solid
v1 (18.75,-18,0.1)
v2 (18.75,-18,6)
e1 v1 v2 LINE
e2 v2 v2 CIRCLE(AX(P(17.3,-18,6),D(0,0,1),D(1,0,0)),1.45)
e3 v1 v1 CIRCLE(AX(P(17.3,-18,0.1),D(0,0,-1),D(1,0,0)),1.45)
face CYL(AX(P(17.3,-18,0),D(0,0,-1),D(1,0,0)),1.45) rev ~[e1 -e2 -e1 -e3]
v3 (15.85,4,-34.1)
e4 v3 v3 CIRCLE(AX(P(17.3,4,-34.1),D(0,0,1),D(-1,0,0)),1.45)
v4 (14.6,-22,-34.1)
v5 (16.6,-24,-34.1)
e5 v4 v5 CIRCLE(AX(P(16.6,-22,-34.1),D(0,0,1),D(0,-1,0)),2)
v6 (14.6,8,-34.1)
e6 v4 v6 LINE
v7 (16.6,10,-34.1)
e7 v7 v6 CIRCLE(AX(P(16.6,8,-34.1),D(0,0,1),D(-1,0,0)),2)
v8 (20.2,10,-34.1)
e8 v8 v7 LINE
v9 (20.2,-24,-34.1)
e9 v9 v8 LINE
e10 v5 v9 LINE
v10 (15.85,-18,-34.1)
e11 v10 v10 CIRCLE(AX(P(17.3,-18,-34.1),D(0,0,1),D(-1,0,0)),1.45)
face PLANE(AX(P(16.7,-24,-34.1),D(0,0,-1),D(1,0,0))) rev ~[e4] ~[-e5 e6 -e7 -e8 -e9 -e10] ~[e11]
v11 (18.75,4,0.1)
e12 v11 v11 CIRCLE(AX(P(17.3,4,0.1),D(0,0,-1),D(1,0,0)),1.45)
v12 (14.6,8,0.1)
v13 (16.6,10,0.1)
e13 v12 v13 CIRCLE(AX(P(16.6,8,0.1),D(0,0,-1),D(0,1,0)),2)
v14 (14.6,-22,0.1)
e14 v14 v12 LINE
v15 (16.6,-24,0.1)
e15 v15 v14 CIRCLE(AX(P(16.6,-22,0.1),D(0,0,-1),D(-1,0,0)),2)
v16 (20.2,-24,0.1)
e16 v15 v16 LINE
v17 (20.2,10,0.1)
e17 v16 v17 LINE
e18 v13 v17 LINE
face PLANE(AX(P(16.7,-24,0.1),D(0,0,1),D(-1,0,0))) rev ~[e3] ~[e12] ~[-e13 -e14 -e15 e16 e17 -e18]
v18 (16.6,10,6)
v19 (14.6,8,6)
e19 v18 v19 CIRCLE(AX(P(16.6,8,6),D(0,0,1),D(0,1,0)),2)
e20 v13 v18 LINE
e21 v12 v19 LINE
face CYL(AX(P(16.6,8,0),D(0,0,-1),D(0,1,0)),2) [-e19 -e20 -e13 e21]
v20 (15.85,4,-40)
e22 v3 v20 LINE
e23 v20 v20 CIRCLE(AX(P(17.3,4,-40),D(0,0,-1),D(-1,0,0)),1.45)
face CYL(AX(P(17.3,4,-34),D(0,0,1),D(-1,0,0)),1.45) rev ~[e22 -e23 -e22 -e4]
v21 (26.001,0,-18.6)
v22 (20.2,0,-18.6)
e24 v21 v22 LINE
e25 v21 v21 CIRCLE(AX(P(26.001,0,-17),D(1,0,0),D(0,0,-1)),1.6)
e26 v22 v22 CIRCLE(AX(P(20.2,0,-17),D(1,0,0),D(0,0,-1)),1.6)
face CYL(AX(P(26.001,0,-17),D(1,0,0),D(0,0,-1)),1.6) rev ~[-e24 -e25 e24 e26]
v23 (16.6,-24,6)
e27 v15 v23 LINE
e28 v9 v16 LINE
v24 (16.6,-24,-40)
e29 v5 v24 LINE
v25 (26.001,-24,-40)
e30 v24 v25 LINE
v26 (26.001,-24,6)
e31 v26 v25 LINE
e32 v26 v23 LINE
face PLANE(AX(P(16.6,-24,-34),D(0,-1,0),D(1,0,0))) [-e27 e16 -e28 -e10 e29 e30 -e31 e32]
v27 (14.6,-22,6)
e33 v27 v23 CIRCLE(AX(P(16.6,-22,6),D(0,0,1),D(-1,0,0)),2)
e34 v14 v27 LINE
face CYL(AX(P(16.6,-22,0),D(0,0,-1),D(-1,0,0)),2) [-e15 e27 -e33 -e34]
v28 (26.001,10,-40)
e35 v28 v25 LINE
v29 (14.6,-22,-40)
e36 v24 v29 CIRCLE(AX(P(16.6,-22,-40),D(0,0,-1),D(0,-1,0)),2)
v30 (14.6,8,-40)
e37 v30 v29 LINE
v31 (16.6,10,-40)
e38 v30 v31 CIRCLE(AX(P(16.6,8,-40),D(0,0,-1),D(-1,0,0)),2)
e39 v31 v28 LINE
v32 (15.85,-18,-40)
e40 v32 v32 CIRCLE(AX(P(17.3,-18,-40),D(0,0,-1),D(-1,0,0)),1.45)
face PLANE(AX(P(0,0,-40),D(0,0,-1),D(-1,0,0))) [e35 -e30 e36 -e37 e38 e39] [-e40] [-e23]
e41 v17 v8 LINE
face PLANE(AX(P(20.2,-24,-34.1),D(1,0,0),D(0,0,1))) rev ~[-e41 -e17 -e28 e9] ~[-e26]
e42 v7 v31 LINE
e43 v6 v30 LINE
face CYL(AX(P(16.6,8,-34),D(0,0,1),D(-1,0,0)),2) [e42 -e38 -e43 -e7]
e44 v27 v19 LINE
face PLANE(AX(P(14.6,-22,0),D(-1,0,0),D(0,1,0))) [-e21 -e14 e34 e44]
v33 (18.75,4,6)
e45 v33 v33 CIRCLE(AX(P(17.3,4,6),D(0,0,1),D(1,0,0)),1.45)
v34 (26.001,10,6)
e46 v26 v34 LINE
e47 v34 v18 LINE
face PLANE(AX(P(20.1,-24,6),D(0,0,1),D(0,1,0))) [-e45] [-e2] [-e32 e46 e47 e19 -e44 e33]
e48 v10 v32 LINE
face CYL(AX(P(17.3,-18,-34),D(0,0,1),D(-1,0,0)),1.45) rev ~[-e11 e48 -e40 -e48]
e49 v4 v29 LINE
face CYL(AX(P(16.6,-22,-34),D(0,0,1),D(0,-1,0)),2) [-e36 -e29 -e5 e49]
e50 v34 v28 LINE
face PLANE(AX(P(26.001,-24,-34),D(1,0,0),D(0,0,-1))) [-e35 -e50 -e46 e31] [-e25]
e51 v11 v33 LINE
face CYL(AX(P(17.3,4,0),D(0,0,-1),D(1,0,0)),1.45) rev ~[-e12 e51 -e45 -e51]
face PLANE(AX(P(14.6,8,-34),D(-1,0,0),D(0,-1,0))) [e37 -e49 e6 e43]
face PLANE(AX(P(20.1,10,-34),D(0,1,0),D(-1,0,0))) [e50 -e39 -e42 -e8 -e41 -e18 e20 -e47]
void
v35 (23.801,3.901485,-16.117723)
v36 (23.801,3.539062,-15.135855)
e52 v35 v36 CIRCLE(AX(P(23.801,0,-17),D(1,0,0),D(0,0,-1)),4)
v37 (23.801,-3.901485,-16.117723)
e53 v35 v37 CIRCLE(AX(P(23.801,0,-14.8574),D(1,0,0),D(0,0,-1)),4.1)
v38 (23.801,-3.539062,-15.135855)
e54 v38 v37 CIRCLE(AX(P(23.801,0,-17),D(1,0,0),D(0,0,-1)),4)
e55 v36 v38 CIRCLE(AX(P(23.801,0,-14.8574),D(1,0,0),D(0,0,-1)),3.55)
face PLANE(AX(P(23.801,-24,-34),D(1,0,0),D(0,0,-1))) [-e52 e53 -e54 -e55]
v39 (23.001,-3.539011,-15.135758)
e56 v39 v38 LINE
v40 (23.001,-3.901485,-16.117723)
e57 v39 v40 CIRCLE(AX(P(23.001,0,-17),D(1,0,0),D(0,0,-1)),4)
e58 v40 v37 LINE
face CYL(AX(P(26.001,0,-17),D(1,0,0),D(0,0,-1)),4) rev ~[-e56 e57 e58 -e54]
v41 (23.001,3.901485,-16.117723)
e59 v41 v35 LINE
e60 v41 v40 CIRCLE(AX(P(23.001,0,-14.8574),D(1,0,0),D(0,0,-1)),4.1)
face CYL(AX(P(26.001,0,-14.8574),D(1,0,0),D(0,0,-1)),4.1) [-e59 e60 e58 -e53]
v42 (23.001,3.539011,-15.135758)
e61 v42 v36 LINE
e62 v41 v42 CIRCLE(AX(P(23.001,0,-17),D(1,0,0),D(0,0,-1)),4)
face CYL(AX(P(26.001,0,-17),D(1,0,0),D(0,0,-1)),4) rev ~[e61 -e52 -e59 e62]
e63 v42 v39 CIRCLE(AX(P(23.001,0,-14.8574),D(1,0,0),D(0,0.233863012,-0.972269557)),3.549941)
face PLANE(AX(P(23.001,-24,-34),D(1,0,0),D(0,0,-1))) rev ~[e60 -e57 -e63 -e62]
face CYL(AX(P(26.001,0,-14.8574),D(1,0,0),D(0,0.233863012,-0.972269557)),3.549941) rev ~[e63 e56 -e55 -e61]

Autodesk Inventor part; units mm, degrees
ref_plane "YZ Plane" through (0, 0, 0) normal (1, 0, 0) x (0, 1, 0)
ref_plane "XZ Plane" through (0, 0, 0) normal (0, 1, 0) x (-1, 0, 0)
ref_plane "XY Plane" through (0, 0, 0) normal (0, 0, 1) x (1, 0, 0)
ref_plane "작업 평면1" through (0, 0, 0) normal (0, 0, 1) x (1, 0, 0)
sketch "스케치1" plane through (0, 0, 0) normal (0, 0, 1) x (1, 0, 0)
  circle A0 centre (0, 0) radius 1.5 projected
  circle A1 centre (0, 0) radius 4.9 projected
  circle A2 centre (0, 0) radius 7.05 projected
  circle A3 centre (7.7781, 7.7783) radius 1.55 projected
  circle A4 centre (-7.7783, 7.7781) radius 1.55 projected
  circle A5 centre (-7.7781, -7.7783) radius 1.55 projected
  circle A6 centre (7.7783, -7.7781) radius 1.55 projected
  circle A7 centre (0, 0) radius 5 projected
  circle A8 centre (0, 0) radius 13.9 projected
  circle A9 centre (0.0001, -11) radius 1.55 projected
  circle A10 centre (-11, -0.0001) radius 1.55 projected
  circle A11 centre (-0.0001, 11) radius 1.55 projected
  circle A12 centre (11, 0.0001) radius 1.55 projected
  line L0 (0, 0) -> (-50, 0)
  line L1 (-15, 14.5) -> (-11.5, 14.5) projected
  line L2 (-15, 14.5) -> (-20.1, 8.5) projected
  line L3 (-20.1, 8.5) -> (-20.1, -44.6) projected
  line L4 (-20.1, -44.6) -> (-15, -50.6) projected
  line L5 (-15, -50.6) -> (15, -50.6) projected
  line L6 (15, -50.6) -> (20.1, -44.6) projected
  line L7 (20.1, -44.6) -> (20.1, 8.5) projected
  line L8 (20.1, 8.5) -> (15, 14.5) projected
  line L9 (11.5, 14.5) -> (15, 14.5) projected
  arc A13 (14.5, 11.5) -> (11.5, 14.5) centre (11.5, 11.5) ccw projected
  line L10 (14.5, -42) -> (14.5, 11.5) projected
  arc A14 (11.5, -45) -> (14.5, -42) centre (11.5, -42) ccw projected
  line L11 (-11.5, -45) -> (11.5, -45) projected
  arc A15 (-14.5, -42) -> (-11.5, -45) centre (-11.5, -42) ccw projected
  line L12 (-14.5, 11.5) -> (-14.5, -42) projected
  arc A16 (-11.5, 14.5) -> (-14.5, 11.5) centre (-11.5, 11.5) ccw projected
  circle A17 centre (17.3, 4) radius 1.35 projected
  circle A18 centre (17.3, -18) radius 1.35 projected
  circle A19 centre (17.3, -40) radius 1.35 projected
  circle A20 centre (11, -47.8) radius 1.35 projected
  circle A21 centre (-17.3, 4) radius 1.35 projected
  circle A22 centre (-17.3, -18) radius 1.35 projected
  circle A23 centre (-17.3, -40) radius 1.35 projected
  circle A24 centre (-11, -47.8) radius 1.35 projected
  circle A25 centre (-17.3, -18) radius 1.45
  circle A26 centre (-17.3, 4) radius 1.45
  arc A27 (-14.6, -42) -> (-11.5, -45.1) centre (-11.5, -42) ccw
  line L13 (-11.5, -45.1) -> (11.5, -45.1)
  arc A28 (11.5, -45.1) -> (14.6, -42) centre (11.5, -42) ccw
  line L14 (14.6, -22) -> (14.6, 8)
  arc A29 (14.6, 11.5) -> (12.5954, 14.4) centre (11.5, 11.5) ccw
  line L15 (12.5954, 14.4) -> (14.9538, 14.4)
  line L16 (14.9538, 14.4) -> (18.6938, 10)
  line L17 (20, -24) -> (20, -44.5632)
  line L18 (20, -44.5632) -> (14.9538, -50.5)
  line L19 (14.9538, -50.5) -> (-14.9538, -50.5)
  line L20 (-14.9538, -50.5) -> (-20, -44.5632)
  line L21 (-18.6938, 10) -> (-14.9538, 14.4)
  line L22 (-14.9538, 14.4) -> (-12.5954, 14.4)
  arc A30 (-12.5954, 14.4) -> (-14.6, 11.5) centre (-11.5, 11.5) ccw
  line L23 (-14.6, 11.5) -> (-14.6, -42)
  line L24 (-17.3, 4) -> (-17.3, 10)
  line L25 (-14.6, 10) -> (-18.0941, 10)
  line L26 (-17.3, -19.35) -> (-17.3, -24)
  line L27 (-14.6, -24) -> (-18.0059, -24)
  line L28 (-20, -44.5632) -> (-20, -24)
  line L29 (-20.0059, -22.0059) -> (-20.0941, 7.9941)
  arc A31 (-18.0941, 10) -> (-20.0941, 7.9941) centre (-18.0941, 8) ccw
  arc A32 (-20.0059, -22.0059) -> (-18.0059, -24) centre (-18.0059, -22) ccw
  line L30 (-36.7788, 11.5) -> (-35.2788, 11.5) projected
  line L31 (-36.7788, 11.5) -> (-36.7788, -41.5) projected
  line L32 (-35.2788, -41.5) -> (-36.7788, -41.5) projected
  spline S0 degree 3 poles (-34.7788, -41) (-34.788, -41.241) (-35.0376, -41.5) (-35.2788, -41.5) knots 0 0 0 0 1 1 1 1 projected
  line L33 (-34.7788, 11) -> (-34.7788, -41) projected
  ellipse E0 centre (-35.2788, 11) end of major axis (-35.2788, 11.5) minor radius 0.5 (-34.7788, 11) -> (-35.2788, 11.5) ccw projected
  line L34 (16.6, -24) -> (18.1, -24)
  line L35 (16.6, 10) -> (18.1, 10)
  line L36 (20.1, -22) -> (20.1, 8)
  circle A33 centre (17.3, 4) radius 1.45
  circle A34 centre (17.3, -18) radius 1.45
  line L37 (18.1, -24) -> (20.1, -24)
  line L38 (20.1, -24) -> (20.1, -22)
  arc A35 (14.6, -22) -> (16.6, -24) centre (16.6, -22) ccw
  line L39 (20.1, 8) -> (20.1, 10)
  line L40 (18.1, 10) -> (20.1, 10)
  arc A36 (16.6, 10) -> (14.6, 8) centre (16.6, 8) ccw
  point P0 (0, 0)
  point P1 (-20.1, 10)
  point P2 (-20.1, -24)
  point P3 (14.6, -24)
  point P4 (14.6, 10)
  point P5 (-19.9941, 8.6246)
  point P6 (-19.0167, 9.7745)
  point P7 (18.825, 10)
  point P8 (20.1, 8.5)
  dimension "d0" = 50
  dimension "d1" = 0.1
  dimension "d2" = 0.1
  dimension "d3" = 0.1
  dimension "d4" = 6
  dimension "d5" = 6
  dimension "d6" = 2
  dimension "d10" = 0.1
  dimension "d11" = 0.1
  dimension "d12" = 2
  dimension "d13" = 2
extrude "돌출1" add sketch "스케치1" along normal blind 6 contours L37 L34 A35 L14 A36 L35 L40 L8 L7 | L40 L39 L8
ref_plane "작업 평면2" through (0, 0, -34) normal (0, 0, -1) x (-1, 0, 0)
sketch "스케치2" plane through (0, 0, -34) normal (0, 0, -1) x (-1, 0, 0)
  line L0 (-16.6, -24) -> (-20.1, -24) projected
  line L1 (-20.1, -24) -> (-20.1, 10) projected
  line L2 (-20.1, 10) -> (-16.6, 10) projected
  arc A0 (-14.6, 8) -> (-16.6, 10) centre (-16.6, 8) ccw projected
  line L3 (-14.6, 8) -> (-14.6, -22) projected
  arc A1 (-16.6, -24) -> (-14.6, -22) centre (-16.6, -22) ccw projected
  circle A2 centre (-17.3, 4) radius 1.45 projected
  circle A3 centre (-17.3, -18) radius 1.45 projected
  point P0 (0, 0)
extrude "돌출2" add sketch "스케치2" along normal blind 6
sketch "스케치3" plane through (20.1, -24, -34) normal (1, 0, 0) x (0, 0, -1)
  line L0 (0, 34) -> (0, 0) projected
  line L1 (0, 0) -> (6, 0) projected
  line L2 (6, 34) -> (6, 0) projected
  line L3 (0, 34) -> (6, 34) projected
  line L4 (-34, 0) -> (-34, 34) projected
  line L5 (-34, 34) -> (-40, 34) projected
  line L6 (-40, 0) -> (-40, 34) projected
  line L7 (-34, 0) -> (-40, 0) projected
  line L8 (6, 0) -> (-40, 0)
  line L9 (-40, 0) -> (-40, 34)
  line L10 (-40, 34) -> (6, 34)
  line L11 (6, 34) -> (6, 0)
  point P0 (-34, 24)
extrude "돌출3" add sketch "스케치3" along normal blind 5.901
sketch "스케치4" plane through (26.001, -24, -34) normal (1, 0, 0) x (0, 0, -1)
  line L0 (-5.3426, 23.9933) -> (-5.3329, 43.9933) projected
  line L1 (-5.3329, 43.9933) -> (-32.9329, 44.0067) projected
  line L2 (-32.9329, 44.0067) -> (-32.9426, 24.0067) projected
  arc A0 (-32.9426, 24.0067) -> (-5.3426, 23.9933) centre (-19.1426, 24) ccw projected
  circle A1 centre (-11.3683, 16.218) radius 1.65 projected
  circle A2 centre (-19.148, 13) radius 1.65 projected
  circle A3 centre (-26.9246, 16.2256) radius 1.65 projected
  circle A4 centre (-30.1426, 24.0054) radius 1.65 projected
  circle A5 centre (-26.917, 31.782) radius 1.65 projected
  circle A6 centre (-19.1373, 35) radius 1.65 projected
  circle A7 centre (-11.3607, 31.7744) radius 1.65 projected
  circle A8 centre (-8.1426, 23.9946) radius 1.65 projected
  circle A9 centre (-19.1426, 24) radius 5.1 projected
  circle A10 centre (-19.1426, 24) radius 4.1
  point P0 (-34, 24)
  dimension "d26" = 8.2
extrude "돌출4" cut sketch "스케치4" against normal blind 3 contours A10
sketch "스케치6" plane through (26.001, -24, -34) normal (1, 0, 0) x (0, 0, -1)
  line L0 (-5.3426, 23.9933) -> (-5.3329, 43.9933) projected
  line L1 (-5.3329, 43.9933) -> (-32.9329, 44.0067) projected
  line L2 (-32.9329, 44.0067) -> (-32.9426, 24.0067) projected
  arc A0 (-32.9426, 24.0067) -> (-5.3426, 23.9933) centre (-19.1426, 24) ccw projected
  circle A1 centre (-11.3683, 16.218) radius 1.65 projected
  circle A2 centre (-19.148, 13) radius 1.65 projected
  circle A3 centre (-26.9246, 16.2256) radius 1.65 projected
  circle A4 centre (-30.1426, 24.0054) radius 1.65 projected
  circle A5 centre (-26.917, 31.782) radius 1.65 projected
  circle A6 centre (-19.1373, 35) radius 1.65 projected
  circle A7 centre (-11.3607, 31.7744) radius 1.65 projected
  circle A8 centre (-8.1426, 23.9946) radius 1.65 projected
  circle A9 centre (-19.1426, 24) radius 5.1 projected
  circle A10 centre (-19.1426, 24) radius 3.55
  circle A11 centre (-19.1426, 24) radius 4.1
  point P0 (-34, 24)
  dimension "d27" = 7.1
  dimension "d28" = 8.2
extrude "돌출6" add sketch "스케치6" against normal blind 2.2 contours A9 | A11
sketch "스케치7" plane through (16.6, -24, 0) normal (0, -1, 0) x (1, 0, 0)
  line L0 (0, 0) -> (3.5, 0) projected
  line L1 (3.5, 0) -> (3.5, -34) projected
  line L2 (3.5, -34) -> (0, -34) projected
  line L3 (0, -34) -> (0, -40) projected
  line L4 (0, -40) -> (9.401, -40) projected
  line L5 (9.401, 6) -> (9.401, -40) projected
  line L6 (0, 6) -> (9.401, 6) projected
  line L7 (0, 0) -> (0, 6) projected
  line L8 (0, -34) -> (-2, -34) projected
  line L9 (-2, -34) -> (-2, -40) projected
  line L10 (0, -40) -> (-2, -40) projected
  line L11 (0, -34) -> (0, -40) projected
  line L12 (-2, 0) -> (0, 0) projected
  line L13 (0, 0) -> (0, 6) projected
  line L14 (-2, 6) -> (0, 6) projected
  line L15 (-2, 0) -> (-2, 6) projected
  line L16 (3.6, -34.1) -> (3.6, 0.1)
  line L17 (3.6, 0.1) -> (0.1, 0.1)
  line L18 (0.1, 0.1) -> (0.1, 5.9)
  line L19 (0.1, 5.9) -> (9.301, 5.9)
  line L20 (9.301, 5.9) -> (9.301, -39.9)
  line L21 (9.301, -39.9) -> (0.1, -39.9)
  line L22 (0.1, -39.9) -> (0.1, -34.1)
  line L23 (0.1, -34.1) -> (3.6, -34.1)
  line L24 (-0.1, 0.1) -> (-1.9, 0.1)
  line L25 (-1.9, 0.1) -> (-1.9, 5.9)
  line L26 (-1.9, 5.9) -> (-0.1, 5.9)
  line L27 (-0.1, 5.9) -> (-0.1, 0.1)
  line L28 (-1.9, -34.1) -> (-0.1, -34.1)
  line L29 (-0.1, -34.1) -> (-0.1, -39.9)
  line L30 (-0.1, -39.9) -> (-1.9, -39.9)
  line L31 (-1.9, -39.9) -> (-1.9, -34.1)
  line L32 (3.6, -34.1) -> (3.6, 0.1)
  line L33 (3.6, 0.1) -> (-2, 0.1)
  line L34 (-2, 0.1) -> (-2, -34.1)
  line L35 (-2, -34.1) -> (3.6, -34.1)
  point P0 (-16.6, 0)
  point P1 (-1.9, 0.1)
  point P2 (-2, 0.1)
  point P3 (-2, -34.1)
  point P4 (0.1, -34.1)
  point P5 (0.1, 0.1)
  point P6 (-0.1, 0.1)
  dimension "d31" = 0.1
  dimension "d32" = 0.1
  dimension "d33" = 0.1
extrude "돌출7" cut sketch "스케치7" against normal through all contours L7 L33 L17 L16 L23 L35 L3 L2 L1 L0 | L12 L15 L33 L24 L7 | L0 L1 L2 L8 L34 L12 | L8 L3 L35 L28 L9
sketch "스케치8" plane through (26.001, -24, -34) normal (1, 0, 0) x (0, 0, -1)
  circle A0 centre (-19.1426, 24) radius 3.55
  line L0 (6, 34) -> (-40, 34) projected
  line L1 (-40, 34) -> (-40, 0) projected
  line L2 (-40, 0) -> (6, 0) projected
  line L3 (6, 0) -> (6, 34) projected
  line L4 (-34, -20.6) -> (-34, 32.5) projected
  line L5 (0, -20.6) -> (0, 32.5) projected
  circle A1 centre (-19.1426, 24) radius 3.55 projected
  circle A2 centre (-18.5217, 13.1058) radius 1.55 projected
  circle A3 centre (-6.1058, 22.4783) radius 1.55 projected
  circle A4 centre (-15.4783, 34.8942) radius 1.55 projected
  circle A5 centre (-27.8942, 25.5217) radius 1.55 projected
  circle A6 centre (-17, 24) radius 5 projected
  circle A7 centre (-17, 24) radius 13.9 projected
  circle A8 centre (-23.6274, 32.7794) radius 1.55 projected
  circle A9 centre (-8.2206, 30.6274) radius 1.55 projected
  circle A10 centre (-10.3726, 15.2206) radius 1.55 projected
  circle A11 centre (-25.7794, 17.3726) radius 1.55 projected
  circle A12 centre (-17, 24) radius 1.55
  dimension "d44" = 3.1
extrude "돌출8" cut sketch "스케치8" against normal through all contours A0 A12 | A0 A12
sketch "스케치9" plane through (26.001, -24, -34) normal (1, 0, 0) x (0, 0, -1)
  line L0 (6, 34) -> (-40, 34) projected
  line L1 (-40, 34) -> (-40, 0) projected
  line L2 (-40, 0) -> (6, 0) projected
  line L3 (6, 0) -> (6, 34) projected
  arc A0 (-15.6911, 24.8302) -> (-15.6911, 23.1698) centre (-19.1426, 24) ccw projected
  line L4 (0.1, 34) -> (-34.1, 34) projected
  line L5 (0.1, 0) -> (0.1, 34) projected
  line L6 (-34.1, 0) -> (0.1, 0) projected
  line L7 (-34.1, 0) -> (-34.1, 34) projected
  arc A1 (-15.6911, 23.1698) -> (-15.6911, 24.8302) centre (-17, 24) ccw projected
  point P0 (-34, 24)
extrude "돌출9" add sketch "스케치9" against normal up to surface (5.801 mm away) contours A1 A0
sketch "스케치10" plane through (26.001, -24, -34) normal (1, 0, 0) x (0, 0, -1)
  line L0 (6, 34) -> (-40, 34) projected
  line L1 (-40, 34) -> (-40, 0) projected
  line L2 (-40, 0) -> (6, 0) projected
  line L3 (6, 0) -> (6, 34) projected
  circle A0 centre (-17, 24) radius 4
  point P0 (-34, 24)
  dimension "d41" = 8
extrude "돌출10" add sketch "스케치10" against normal up to surface (5.801 mm away) contours A0
sketch "스케치11" plane through (26.001, -24, -34) normal (1, 0, 0) x (0, 0, -1)
  circle A0 centre (-18.5217, 13.1058) radius 1.55 projected
  circle A1 centre (-6.1058, 22.4783) radius 1.55 projected
  circle A2 centre (-15.4783, 34.8942) radius 1.55 projected
  circle A3 centre (-27.8942, 25.5217) radius 1.55 projected
  circle A4 centre (-17, 24) radius 5 projected
  circle A5 centre (-17, 24) radius 13.9 projected
  circle A6 centre (-23.6274, 32.7794) radius 1.55 projected
  circle A7 centre (-8.2206, 30.6274) radius 1.55 projected
  circle A8 centre (-10.3726, 15.2206) radius 1.55 projected
  circle A9 centre (-25.7794, 17.3726) radius 1.55 projected
  circle A10 centre (-17, 24) radius 1.6
  point P0 (-34, 24)
  dimension "d45" = 3.2
extrude "돌출11" cut sketch "스케치11" against normal blind 10 contours A10
properties part number "3" material "LCP 플라스틱"
